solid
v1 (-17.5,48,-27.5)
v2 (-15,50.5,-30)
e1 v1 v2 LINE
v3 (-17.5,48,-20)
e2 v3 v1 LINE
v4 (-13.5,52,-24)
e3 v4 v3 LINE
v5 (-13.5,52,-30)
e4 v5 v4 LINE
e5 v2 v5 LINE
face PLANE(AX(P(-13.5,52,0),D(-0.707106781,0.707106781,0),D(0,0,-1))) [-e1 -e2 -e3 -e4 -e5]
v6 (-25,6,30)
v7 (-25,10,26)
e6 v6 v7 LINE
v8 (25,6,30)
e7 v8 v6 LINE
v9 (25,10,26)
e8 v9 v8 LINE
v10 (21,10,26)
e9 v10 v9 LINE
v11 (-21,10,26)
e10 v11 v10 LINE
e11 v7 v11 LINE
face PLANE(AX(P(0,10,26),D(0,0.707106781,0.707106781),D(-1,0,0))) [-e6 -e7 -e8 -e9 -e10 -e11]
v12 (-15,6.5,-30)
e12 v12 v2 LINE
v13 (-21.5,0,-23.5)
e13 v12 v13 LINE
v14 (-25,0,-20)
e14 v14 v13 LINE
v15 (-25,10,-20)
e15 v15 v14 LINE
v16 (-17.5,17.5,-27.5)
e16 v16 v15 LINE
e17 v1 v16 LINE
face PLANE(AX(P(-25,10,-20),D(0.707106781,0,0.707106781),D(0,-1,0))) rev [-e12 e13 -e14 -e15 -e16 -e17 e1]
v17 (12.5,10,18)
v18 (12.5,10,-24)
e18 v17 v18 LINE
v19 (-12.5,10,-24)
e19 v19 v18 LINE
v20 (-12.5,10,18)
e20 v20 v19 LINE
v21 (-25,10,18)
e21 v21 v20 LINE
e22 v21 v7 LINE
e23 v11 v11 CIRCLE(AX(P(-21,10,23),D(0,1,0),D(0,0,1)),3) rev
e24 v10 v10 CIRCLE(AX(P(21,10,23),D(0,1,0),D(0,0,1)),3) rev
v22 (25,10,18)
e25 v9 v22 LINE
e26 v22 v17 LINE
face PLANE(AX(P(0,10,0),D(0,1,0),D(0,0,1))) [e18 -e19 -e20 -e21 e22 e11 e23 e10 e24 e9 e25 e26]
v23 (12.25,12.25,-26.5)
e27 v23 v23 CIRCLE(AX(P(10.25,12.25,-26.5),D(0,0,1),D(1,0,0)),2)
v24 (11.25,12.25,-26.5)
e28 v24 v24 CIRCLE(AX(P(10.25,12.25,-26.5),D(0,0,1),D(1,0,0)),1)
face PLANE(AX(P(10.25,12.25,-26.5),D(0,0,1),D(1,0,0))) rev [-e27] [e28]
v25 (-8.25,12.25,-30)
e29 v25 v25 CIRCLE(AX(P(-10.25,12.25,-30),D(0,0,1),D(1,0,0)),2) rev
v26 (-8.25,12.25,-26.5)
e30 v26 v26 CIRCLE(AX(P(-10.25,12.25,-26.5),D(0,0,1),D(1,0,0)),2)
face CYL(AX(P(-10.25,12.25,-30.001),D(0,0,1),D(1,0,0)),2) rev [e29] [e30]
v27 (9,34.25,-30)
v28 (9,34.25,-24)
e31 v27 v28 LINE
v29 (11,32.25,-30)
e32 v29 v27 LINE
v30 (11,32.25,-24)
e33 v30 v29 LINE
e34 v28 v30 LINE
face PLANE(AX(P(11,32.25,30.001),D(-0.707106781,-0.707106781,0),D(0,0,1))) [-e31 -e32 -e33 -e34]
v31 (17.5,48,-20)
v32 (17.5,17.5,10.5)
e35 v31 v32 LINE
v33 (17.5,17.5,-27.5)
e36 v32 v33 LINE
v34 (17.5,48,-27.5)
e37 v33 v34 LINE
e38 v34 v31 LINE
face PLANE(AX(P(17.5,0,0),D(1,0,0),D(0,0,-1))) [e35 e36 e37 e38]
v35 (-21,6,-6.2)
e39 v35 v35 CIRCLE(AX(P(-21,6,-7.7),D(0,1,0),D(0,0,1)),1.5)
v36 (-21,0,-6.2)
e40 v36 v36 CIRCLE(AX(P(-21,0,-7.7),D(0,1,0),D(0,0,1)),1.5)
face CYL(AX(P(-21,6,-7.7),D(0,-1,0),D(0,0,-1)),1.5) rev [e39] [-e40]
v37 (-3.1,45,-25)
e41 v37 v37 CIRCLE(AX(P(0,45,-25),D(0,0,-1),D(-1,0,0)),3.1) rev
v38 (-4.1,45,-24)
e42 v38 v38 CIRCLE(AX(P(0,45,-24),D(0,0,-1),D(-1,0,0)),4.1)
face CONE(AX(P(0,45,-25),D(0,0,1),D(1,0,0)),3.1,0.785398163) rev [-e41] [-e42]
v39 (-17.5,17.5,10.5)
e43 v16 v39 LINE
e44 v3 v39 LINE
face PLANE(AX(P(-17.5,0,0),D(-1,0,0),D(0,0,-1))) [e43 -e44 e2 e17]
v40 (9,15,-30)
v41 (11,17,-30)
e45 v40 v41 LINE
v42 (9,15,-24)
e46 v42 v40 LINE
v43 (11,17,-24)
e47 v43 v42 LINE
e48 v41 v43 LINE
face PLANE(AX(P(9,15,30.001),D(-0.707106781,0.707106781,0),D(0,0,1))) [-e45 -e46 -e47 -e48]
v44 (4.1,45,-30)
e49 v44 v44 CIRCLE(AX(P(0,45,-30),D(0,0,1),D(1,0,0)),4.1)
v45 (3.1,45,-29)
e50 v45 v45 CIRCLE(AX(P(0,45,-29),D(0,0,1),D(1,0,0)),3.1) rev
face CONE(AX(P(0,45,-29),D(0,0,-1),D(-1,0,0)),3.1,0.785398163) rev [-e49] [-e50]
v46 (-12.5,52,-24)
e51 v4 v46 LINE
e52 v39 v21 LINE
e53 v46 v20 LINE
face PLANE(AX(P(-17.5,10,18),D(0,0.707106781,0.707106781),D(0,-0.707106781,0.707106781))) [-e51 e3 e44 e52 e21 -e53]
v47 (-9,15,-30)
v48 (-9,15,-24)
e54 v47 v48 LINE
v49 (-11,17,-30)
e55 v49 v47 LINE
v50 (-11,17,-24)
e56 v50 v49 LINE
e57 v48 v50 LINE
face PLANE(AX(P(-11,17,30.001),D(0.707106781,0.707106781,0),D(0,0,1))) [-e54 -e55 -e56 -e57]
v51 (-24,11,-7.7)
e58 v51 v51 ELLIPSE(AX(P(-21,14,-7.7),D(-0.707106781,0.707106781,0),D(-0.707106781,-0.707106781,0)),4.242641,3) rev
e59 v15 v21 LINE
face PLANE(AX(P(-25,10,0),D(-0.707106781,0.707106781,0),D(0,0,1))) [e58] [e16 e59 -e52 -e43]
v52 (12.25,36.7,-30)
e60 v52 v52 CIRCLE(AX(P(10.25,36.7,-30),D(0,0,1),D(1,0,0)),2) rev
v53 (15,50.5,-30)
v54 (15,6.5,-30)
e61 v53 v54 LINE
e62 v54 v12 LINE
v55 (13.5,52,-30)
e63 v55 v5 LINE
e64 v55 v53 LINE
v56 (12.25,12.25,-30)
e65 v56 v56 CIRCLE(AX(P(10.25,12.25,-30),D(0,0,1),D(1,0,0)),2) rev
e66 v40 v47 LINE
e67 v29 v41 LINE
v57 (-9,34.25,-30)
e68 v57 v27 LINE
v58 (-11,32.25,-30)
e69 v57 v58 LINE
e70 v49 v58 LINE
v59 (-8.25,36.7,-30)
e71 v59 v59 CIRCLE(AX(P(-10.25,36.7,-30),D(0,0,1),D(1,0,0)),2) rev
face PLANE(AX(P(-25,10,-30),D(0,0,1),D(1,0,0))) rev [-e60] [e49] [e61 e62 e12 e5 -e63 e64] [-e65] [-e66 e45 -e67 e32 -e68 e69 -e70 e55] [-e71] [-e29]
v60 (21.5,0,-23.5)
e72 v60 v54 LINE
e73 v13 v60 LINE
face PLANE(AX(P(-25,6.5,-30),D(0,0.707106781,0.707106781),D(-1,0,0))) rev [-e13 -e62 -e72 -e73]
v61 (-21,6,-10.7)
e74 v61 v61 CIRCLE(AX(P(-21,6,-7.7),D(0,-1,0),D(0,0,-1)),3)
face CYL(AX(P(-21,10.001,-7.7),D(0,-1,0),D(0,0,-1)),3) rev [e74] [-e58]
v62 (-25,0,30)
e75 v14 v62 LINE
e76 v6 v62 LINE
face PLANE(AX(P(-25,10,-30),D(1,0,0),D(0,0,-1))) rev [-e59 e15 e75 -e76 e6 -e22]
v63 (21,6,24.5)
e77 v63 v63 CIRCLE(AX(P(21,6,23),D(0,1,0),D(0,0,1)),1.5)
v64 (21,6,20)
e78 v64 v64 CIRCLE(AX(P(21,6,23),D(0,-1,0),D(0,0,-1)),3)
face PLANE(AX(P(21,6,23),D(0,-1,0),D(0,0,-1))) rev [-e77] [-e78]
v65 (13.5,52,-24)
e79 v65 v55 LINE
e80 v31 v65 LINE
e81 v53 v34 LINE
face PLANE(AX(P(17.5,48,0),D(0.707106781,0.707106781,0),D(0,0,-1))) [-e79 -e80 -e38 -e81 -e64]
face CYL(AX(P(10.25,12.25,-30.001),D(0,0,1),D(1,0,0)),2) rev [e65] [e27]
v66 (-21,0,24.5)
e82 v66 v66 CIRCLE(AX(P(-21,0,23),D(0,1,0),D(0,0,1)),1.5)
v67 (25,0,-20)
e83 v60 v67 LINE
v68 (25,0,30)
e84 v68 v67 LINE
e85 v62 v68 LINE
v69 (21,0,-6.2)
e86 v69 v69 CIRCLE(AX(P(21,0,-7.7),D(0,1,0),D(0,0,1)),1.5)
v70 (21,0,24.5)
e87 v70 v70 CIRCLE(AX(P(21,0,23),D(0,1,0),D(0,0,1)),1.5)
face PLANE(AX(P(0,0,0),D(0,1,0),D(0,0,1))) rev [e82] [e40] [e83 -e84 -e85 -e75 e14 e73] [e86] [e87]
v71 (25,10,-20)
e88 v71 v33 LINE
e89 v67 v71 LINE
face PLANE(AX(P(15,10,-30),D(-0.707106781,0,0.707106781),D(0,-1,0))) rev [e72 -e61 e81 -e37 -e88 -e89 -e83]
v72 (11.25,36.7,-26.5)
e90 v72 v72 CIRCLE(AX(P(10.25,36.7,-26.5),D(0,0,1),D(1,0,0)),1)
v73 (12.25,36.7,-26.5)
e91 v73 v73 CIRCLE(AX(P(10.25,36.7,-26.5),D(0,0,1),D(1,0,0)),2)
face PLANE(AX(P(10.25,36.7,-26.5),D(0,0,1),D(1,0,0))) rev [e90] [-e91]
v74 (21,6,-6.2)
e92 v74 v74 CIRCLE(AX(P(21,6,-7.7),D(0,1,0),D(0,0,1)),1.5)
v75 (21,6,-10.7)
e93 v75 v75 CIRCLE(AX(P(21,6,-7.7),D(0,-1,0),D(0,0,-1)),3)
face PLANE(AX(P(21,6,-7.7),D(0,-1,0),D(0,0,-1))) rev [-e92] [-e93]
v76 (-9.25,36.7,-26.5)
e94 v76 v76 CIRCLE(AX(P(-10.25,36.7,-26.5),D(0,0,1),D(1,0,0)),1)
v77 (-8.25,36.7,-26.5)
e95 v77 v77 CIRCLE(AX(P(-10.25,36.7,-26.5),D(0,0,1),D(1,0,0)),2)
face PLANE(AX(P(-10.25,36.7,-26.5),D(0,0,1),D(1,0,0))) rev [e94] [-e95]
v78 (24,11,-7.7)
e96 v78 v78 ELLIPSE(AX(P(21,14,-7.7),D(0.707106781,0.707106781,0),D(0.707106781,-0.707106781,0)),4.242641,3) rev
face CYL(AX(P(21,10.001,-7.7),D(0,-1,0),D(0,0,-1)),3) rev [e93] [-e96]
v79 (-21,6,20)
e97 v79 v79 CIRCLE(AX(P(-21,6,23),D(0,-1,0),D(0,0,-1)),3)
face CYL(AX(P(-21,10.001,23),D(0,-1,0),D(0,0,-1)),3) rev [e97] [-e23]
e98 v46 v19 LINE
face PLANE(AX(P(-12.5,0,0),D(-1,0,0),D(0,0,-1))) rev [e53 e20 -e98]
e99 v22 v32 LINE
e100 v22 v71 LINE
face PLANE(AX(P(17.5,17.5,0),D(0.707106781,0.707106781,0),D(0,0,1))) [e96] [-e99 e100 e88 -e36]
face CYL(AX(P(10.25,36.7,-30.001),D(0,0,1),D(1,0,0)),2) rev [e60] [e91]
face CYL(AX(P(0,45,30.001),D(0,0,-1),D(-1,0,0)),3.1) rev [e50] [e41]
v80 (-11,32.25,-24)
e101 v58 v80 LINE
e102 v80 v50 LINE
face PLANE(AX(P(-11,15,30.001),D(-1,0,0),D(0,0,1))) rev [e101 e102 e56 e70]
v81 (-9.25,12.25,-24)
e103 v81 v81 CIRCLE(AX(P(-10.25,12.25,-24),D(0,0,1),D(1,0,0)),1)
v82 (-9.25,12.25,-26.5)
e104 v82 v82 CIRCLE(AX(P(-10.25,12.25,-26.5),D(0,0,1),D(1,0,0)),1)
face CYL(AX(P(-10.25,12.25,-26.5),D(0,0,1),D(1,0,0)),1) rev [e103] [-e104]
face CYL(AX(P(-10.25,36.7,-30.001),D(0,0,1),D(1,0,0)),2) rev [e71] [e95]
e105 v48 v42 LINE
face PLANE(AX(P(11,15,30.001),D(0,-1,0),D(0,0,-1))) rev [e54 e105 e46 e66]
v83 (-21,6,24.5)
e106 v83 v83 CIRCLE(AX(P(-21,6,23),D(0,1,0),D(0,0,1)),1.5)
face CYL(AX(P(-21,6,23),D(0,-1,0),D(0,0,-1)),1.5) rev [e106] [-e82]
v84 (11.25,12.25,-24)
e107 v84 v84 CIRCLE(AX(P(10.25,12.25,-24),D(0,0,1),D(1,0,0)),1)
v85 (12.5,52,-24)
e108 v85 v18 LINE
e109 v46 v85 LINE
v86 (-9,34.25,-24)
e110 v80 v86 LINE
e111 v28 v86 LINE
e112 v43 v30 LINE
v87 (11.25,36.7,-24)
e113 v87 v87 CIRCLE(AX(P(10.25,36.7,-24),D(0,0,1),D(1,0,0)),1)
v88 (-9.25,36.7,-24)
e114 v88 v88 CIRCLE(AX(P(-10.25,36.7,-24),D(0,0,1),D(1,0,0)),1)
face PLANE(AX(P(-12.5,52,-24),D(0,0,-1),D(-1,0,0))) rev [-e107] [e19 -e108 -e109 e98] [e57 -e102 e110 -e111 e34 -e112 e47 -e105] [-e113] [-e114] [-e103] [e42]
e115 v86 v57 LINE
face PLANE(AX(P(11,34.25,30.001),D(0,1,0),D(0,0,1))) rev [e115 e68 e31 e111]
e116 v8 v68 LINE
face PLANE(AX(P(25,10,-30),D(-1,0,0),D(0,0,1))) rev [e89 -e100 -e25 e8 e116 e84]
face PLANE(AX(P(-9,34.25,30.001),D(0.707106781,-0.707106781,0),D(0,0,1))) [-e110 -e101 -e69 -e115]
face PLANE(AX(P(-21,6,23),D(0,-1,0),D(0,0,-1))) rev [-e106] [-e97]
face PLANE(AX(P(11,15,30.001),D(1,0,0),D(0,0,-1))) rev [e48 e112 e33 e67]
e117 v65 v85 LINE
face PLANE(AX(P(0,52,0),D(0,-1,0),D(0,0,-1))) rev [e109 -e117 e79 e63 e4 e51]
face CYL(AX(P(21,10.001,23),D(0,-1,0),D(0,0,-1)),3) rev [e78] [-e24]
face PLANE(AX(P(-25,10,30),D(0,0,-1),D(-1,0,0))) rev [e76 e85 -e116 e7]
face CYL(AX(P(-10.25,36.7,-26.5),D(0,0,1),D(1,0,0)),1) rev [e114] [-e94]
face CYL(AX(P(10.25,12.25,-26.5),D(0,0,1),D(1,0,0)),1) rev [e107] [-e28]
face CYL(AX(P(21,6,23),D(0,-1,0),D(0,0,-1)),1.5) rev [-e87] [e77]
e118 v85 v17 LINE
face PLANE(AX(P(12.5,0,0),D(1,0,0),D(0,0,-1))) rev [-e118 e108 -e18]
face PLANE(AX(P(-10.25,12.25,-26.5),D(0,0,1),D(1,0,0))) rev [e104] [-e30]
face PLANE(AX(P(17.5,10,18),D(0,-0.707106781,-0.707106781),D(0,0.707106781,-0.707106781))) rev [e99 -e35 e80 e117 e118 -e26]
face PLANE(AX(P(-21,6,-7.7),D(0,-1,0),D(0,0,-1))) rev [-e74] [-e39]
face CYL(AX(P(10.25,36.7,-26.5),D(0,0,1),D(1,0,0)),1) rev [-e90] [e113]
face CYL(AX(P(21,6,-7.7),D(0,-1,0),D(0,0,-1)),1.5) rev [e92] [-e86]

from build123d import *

# Parameters (mm, degrees)
SKETCH1_W           = 50
SKETCH1_H           = 60
BOSS_EXTRUDE1_DEPTH = 10
SKETCH2_R           = 1.5
CUT_EXTRUDE1_DEPTH  = 6
CUT_EXTRUDE2_REACH  = 41.509
SKETCH3_R           = 3
SKETCH5_W           = 25
SKETCH5_H           = 6
BOSS_EXTRUDE3_DEPTH = 42
CUT_EXTRUDE3_REACH  = 85.241
SKETCH6_W           = 22
SKETCH6_H           = 19.25
SKETCH7_R           = 1
CUT_EXTRUDE4_DEPTH  = 2.5
CUT_EXTRUDE5_REACH  = 82.754
SKETCH8_R           = 2
BOSS_EXTRUDE4_DEPTH = 5
CHAMFER1_SIZE       = 7.5
CHAMFER2_SIZE       = 10
CHAMFER4_SIZE       = 6.5
CHAMFER5_SIZE       = 4
CHAMFER6_SIZE       = 4
CHAMFER7_SIZE       = 2
CUT_EXTRUDE6_REACH  = 85.241
SKETCH10_R          = 3.1
CHAMFER8_SIZE       = 1


# Some blends are built 0.0001 mm under size
with BuildPart() as part:
    # Sketch1 → Boss-Extrude1 (new body)
    with BuildSketch(Plane(origin=(0, 0, 0), x_dir=(1, 0, 0), z_dir=(0, 1, 0))):
        Rectangle(SKETCH1_W, SKETCH1_H)
    extrude(amount=BOSS_EXTRUDE1_DEPTH)

    # Sketch2 → Cut-Extrude1 (cut)
    with BuildSketch(Plane(origin=(0, 0, 0), x_dir=(1, 0, 0), z_dir=(0, 1, 0))):
        with Locations(Location((-21, 7.7, 0), (0, 0, 270))):
            Circle(SKETCH2_R)
        with Locations(Location((-21, -23, 0), (0, 0, 270))):
            Circle(SKETCH2_R)
        with Locations(Location((21, 7.7, 0), (0, 0, 270))):
            Circle(SKETCH2_R)
        with Locations(Location((21, -23, 0), (0, 0, 270))):
            Circle(SKETCH2_R)
    extrude(amount=CUT_EXTRUDE1_DEPTH, mode=Mode.SUBTRACT)

    # Sketch3 → Cut-Extrude2 (cut, up to next)
    with BuildSketch(Plane.XZ.offset(-6), mode=Mode.PRIVATE) as cut_extrude2_sk1:
        with Locations(Location((-21, 23, 0), (0, 0, 270))):
            Circle(SKETCH3_R)
    cut_extrude2_tool1 = extrude(cut_extrude2_sk1.sketch, amount=-CUT_EXTRUDE2_REACH, mode=Mode.PRIVATE) & part.part
    # Sketch3 → Cut-Extrude2 (cut, up to next)
    with BuildSketch(Plane.XZ.offset(-6), mode=Mode.PRIVATE) as cut_extrude2_sk2:
        with Locations(Location((21, 23, 0), (0, 0, 270))):
            Circle(SKETCH3_R)
    cut_extrude2_tool2 = extrude(cut_extrude2_sk2.sketch, amount=-CUT_EXTRUDE2_REACH, mode=Mode.PRIVATE) & part.part
    # Sketch3 → Cut-Extrude2 (cut, up to next)
    with BuildSketch(Plane.XZ.offset(-6), mode=Mode.PRIVATE) as cut_extrude2_sk3:
        with Locations(Location((21, -7.7, 0), (0, 0, 270))):
            Circle(SKETCH3_R)
    cut_extrude2_tool3 = extrude(cut_extrude2_sk3.sketch, amount=-CUT_EXTRUDE2_REACH, mode=Mode.PRIVATE) & part.part
    # Sketch3 → Cut-Extrude2 (cut, up to next)
    with BuildSketch(Plane.XZ.offset(-6), mode=Mode.PRIVATE) as cut_extrude2_sk4:
        with Locations(Location((-21, -7.7, 0), (0, 0, 270))):
            Circle(SKETCH3_R)
    cut_extrude2_tool4 = extrude(cut_extrude2_sk4.sketch, amount=-CUT_EXTRUDE2_REACH, mode=Mode.PRIVATE) & part.part
    add(cut_extrude2_tool1.solids().sort_by_distance((-21, 6, 23))[0], mode=Mode.SUBTRACT)
    add(cut_extrude2_tool2.solids().sort_by_distance((21, 6, 23))[0], mode=Mode.SUBTRACT)
    add(cut_extrude2_tool3.solids().sort_by_distance((21, 6, -7.7))[0], mode=Mode.SUBTRACT)
    add(cut_extrude2_tool4.solids().sort_by_distance((-21, 6, -7.7))[0], mode=Mode.SUBTRACT)

    # Sketch5 → Boss-Extrude3 (add)
    with BuildSketch(Plane(origin=(0, 10, 0), x_dir=(1, 0, 0), z_dir=(0, 1, 0))):
        with Locations((0, 27)):
            Rectangle(SKETCH5_W, SKETCH5_H)
    extrude(amount=BOSS_EXTRUDE3_DEPTH)

    # Sketch6 → Cut-Extrude3 (cut, up to next)
    with BuildSketch(Plane(origin=(0, 0, -30), x_dir=(-1, 0, 0), z_dir=(0, 0, -1)), mode=Mode.PRIVATE) as cut_extrude3_sk1:
        with Locations((0, 24.625)):
            Rectangle(SKETCH6_W, SKETCH6_H)
    cut_extrude3_tool1 = extrude(cut_extrude3_sk1.sketch, amount=-CUT_EXTRUDE3_REACH, mode=Mode.PRIVATE) & part.part
    add(cut_extrude3_tool1.solids().sort_by_distance((0, 24.625, -30))[0], mode=Mode.SUBTRACT)

    # Sketch7 → Cut-Extrude4 (cut)
    with BuildSketch(Plane.XY.offset(-24)):
        with Locations((10.25, 12.25)):
            Circle(SKETCH7_R)
        with Locations((-10.25, 12.25)):
            Circle(SKETCH7_R)
        with Locations((-10.25, 36.7)):
            Circle(SKETCH7_R)
        with Locations((10.25, 36.7)):
            Circle(SKETCH7_R)
    extrude(amount=-CUT_EXTRUDE4_DEPTH, mode=Mode.SUBTRACT)

    # Sketch8 → Cut-Extrude5 (cut, up to next)
    with BuildSketch(Plane.XY.offset(-26.5), mode=Mode.PRIVATE) as cut_extrude5_sk1:
        with Locations((-10.25, 36.7)):
            Circle(SKETCH8_R)
    cut_extrude5_tool1 = extrude(cut_extrude5_sk1.sketch, amount=-CUT_EXTRUDE5_REACH, mode=Mode.PRIVATE) & part.part
    # Sketch8 → Cut-Extrude5 (cut, up to next)
    with BuildSketch(Plane.XY.offset(-26.5), mode=Mode.PRIVATE) as cut_extrude5_sk2:
        with Locations((10.25, 36.7)):
            Circle(SKETCH8_R)
    cut_extrude5_tool2 = extrude(cut_extrude5_sk2.sketch, amount=-CUT_EXTRUDE5_REACH, mode=Mode.PRIVATE) & part.part
    # Sketch8 → Cut-Extrude5 (cut, up to next)
    with BuildSketch(Plane.XY.offset(-26.5), mode=Mode.PRIVATE) as cut_extrude5_sk3:
        with Locations((10.25, 12.25)):
            Circle(SKETCH8_R)
    cut_extrude5_tool3 = extrude(cut_extrude5_sk3.sketch, amount=-CUT_EXTRUDE5_REACH, mode=Mode.PRIVATE) & part.part
    # Sketch8 → Cut-Extrude5 (cut, up to next)
    with BuildSketch(Plane.XY.offset(-26.5), mode=Mode.PRIVATE) as cut_extrude5_sk4:
        with Locations((-10.25, 12.25)):
            Circle(SKETCH8_R)
    cut_extrude5_tool4 = extrude(cut_extrude5_sk4.sketch, amount=-CUT_EXTRUDE5_REACH, mode=Mode.PRIVATE) & part.part
    add(cut_extrude5_tool1.solids().sort_by_distance((-10.25, 36.7, -26.5))[0], mode=Mode.SUBTRACT)
    add(cut_extrude5_tool2.solids().sort_by_distance((10.25, 36.7, -26.5))[0], mode=Mode.SUBTRACT)
    add(cut_extrude5_tool3.solids().sort_by_distance((10.25, 12.25, -26.5))[0], mode=Mode.SUBTRACT)
    add(cut_extrude5_tool4.solids().sort_by_distance((-10.25, 12.25, -26.5))[0], mode=Mode.SUBTRACT)

    # Sketch9 → Boss-Extrude4 (add)
    with BuildSketch(Plane(origin=(12.5, 0, 0), x_dir=(0, 0, -1), z_dir=(1, 0, 0))):
        Polygon((30, 52), (24, 52), (-18, 10), (30, 10), align=None)
    boss_extrude4 = extrude(amount=BOSS_EXTRUDE4_DEPTH)

    # Mirror1: Boss-Extrude4 across plane
    add(boss_extrude4.mirror(Plane(origin=(0, 0, 0), x_dir=(0, 0, 1), z_dir=(1, 0, 0))))

    # Chamfer1
    # the kernel refuses this chamfer: 7.5 mm, written as the material it adds along each edge
    with BuildSketch(Plane(origin=(17.5, 10, 37.28762241), x_dir=(-0.02749587661058632, 0.9996219169112968, 0), z_dir=(0, 0, -1))) as chamfer1_piece_1_section:
        Polygon((CHAMFER1_SIZE * 0.999621916911, CHAMFER1_SIZE * 0.0274958766106), (-CHAMFER1_SIZE * 0.0274958766106, CHAMFER1_SIZE * 0.999621916911), (0, 0), align=None)
    chamfer1_piece_1 = extrude(amount=67.28762241, mode=Mode.PRIVATE)
    chamfer1_piece_1 = split(chamfer1_piece_1, bisect_by=Plane(origin=(18.496268946, 33.174911168, -5.174911168), z_dir=(0, -0.7071067811865462, -0.7071067811865489)), keep=Keep.TOP, mode=Mode.PRIVATE)
    chamfer1_piece_1 = chamfer1_piece_1 - Plane(origin=(21, 16.349822336, -7.7), x_dir=(0, 0, -1), z_dir=(0, -1, 0)) * Cylinder(3, 165, mode=Mode.PRIVATE)
    chamfer1_piece_1 = split(chamfer1_piece_1, bisect_by=Plane(origin=(25, 16.349822336, -22), z_dir=(-1, 0, 0)), keep=Keep.TOP, mode=Mode.PRIVATE)
    add(chamfer1_piece_1)
    with BuildSketch(Plane(origin=(-17.5, 10, 37.28762241), x_dir=(0.02749587661058632, 0.9996219169112968, 0), z_dir=(0, 0, -1))) as chamfer1_piece_2_section:
        Polygon((CHAMFER1_SIZE * 0.999621916911, -CHAMFER1_SIZE * 0.0274958766106), (-CHAMFER1_SIZE * 0.0274958766106, -CHAMFER1_SIZE * 0.999621916911), (0, 0), align=None)
    chamfer1_piece_2 = extrude(amount=67.28762241, mode=Mode.PRIVATE)
    chamfer1_piece_2 = split(chamfer1_piece_2, bisect_by=Plane(origin=(-18.49626887, 33.174911131, -5.174911131), z_dir=(0, -0.7071067811865462, -0.7071067811865489)), keep=Keep.TOP, mode=Mode.PRIVATE)
    chamfer1_piece_2 = chamfer1_piece_2 - Plane(origin=(-21, 16.349822261, -7.7), x_dir=(0, 0, -1), z_dir=(0, -1, 0)) * Cylinder(3, 165, mode=Mode.PRIVATE)
    chamfer1_piece_2 = split(chamfer1_piece_2, bisect_by=Plane(origin=(-25, 16.349822261, -22), z_dir=(1, 0, 0)), keep=Keep.TOP, mode=Mode.PRIVATE)
    add(chamfer1_piece_2)

    # Chamfer2
    chamfer2_edges = [part.edges().sort_by_distance(p)[0] for p in [
        (-25, 5, -30),
        (25, 5, -30),
    ]]
    chamfer(chamfer2_edges, length=CHAMFER2_SIZE)

    # Chamfer4
    chamfer4_edges = [part.edges().sort_by_distance(p)[0] for p in [
        (0, 0, -30),
    ]]
    chamfer(chamfer4_edges, length=CHAMFER4_SIZE)

    # Chamfer5
    chamfer5_edges = [part.edges().sort_by_distance(p)[0] for p in [
        (17.5, 52, -25.75),
        (-17.5, 52, -25.75),
    ]]
    chamfer(chamfer5_edges, length=CHAMFER5_SIZE)

    # Chamfer6
    chamfer6_edges = [part.edges().sort_by_distance(p)[0] for p in [
        (0, 10, 30),
    ]]
    chamfer(chamfer6_edges, length=CHAMFER6_SIZE - 0.0001)  # a hair under: the kernel refuses the full size

    # Chamfer7
    chamfer7_edges = [part.edges().sort_by_distance(p)[0] for p in [
        (-11, 34.25, -27),
        (-11, 15, -27),
        (11, 15, -27),
        (11, 34.25, -27),
    ]]
    chamfer(chamfer7_edges, length=CHAMFER7_SIZE)

    # Sketch10 → Cut-Extrude6 (cut, up to next)
    with BuildSketch(Plane(origin=(0, 0, -30), x_dir=(-1, 0, 0), z_dir=(0, 0, -1)), mode=Mode.PRIVATE) as cut_extrude6_sk1:
        with Locations((0, 45)):
            Circle(SKETCH10_R)
    cut_extrude6_tool1 = extrude(cut_extrude6_sk1.sketch, amount=-CUT_EXTRUDE6_REACH, mode=Mode.PRIVATE) & part.part
    add(cut_extrude6_tool1.solids().sort_by_distance((0, 45, -30))[0], mode=Mode.SUBTRACT)

    # Chamfer8
    chamfer8_edges = [part.edges().sort_by_distance(p)[0] for p in [
        (3.1, 45, -30),
        (3.1, 45, -24),
    ]]
    chamfer(chamfer8_edges, length=CHAMFER8_SIZE)


solid = part.part
